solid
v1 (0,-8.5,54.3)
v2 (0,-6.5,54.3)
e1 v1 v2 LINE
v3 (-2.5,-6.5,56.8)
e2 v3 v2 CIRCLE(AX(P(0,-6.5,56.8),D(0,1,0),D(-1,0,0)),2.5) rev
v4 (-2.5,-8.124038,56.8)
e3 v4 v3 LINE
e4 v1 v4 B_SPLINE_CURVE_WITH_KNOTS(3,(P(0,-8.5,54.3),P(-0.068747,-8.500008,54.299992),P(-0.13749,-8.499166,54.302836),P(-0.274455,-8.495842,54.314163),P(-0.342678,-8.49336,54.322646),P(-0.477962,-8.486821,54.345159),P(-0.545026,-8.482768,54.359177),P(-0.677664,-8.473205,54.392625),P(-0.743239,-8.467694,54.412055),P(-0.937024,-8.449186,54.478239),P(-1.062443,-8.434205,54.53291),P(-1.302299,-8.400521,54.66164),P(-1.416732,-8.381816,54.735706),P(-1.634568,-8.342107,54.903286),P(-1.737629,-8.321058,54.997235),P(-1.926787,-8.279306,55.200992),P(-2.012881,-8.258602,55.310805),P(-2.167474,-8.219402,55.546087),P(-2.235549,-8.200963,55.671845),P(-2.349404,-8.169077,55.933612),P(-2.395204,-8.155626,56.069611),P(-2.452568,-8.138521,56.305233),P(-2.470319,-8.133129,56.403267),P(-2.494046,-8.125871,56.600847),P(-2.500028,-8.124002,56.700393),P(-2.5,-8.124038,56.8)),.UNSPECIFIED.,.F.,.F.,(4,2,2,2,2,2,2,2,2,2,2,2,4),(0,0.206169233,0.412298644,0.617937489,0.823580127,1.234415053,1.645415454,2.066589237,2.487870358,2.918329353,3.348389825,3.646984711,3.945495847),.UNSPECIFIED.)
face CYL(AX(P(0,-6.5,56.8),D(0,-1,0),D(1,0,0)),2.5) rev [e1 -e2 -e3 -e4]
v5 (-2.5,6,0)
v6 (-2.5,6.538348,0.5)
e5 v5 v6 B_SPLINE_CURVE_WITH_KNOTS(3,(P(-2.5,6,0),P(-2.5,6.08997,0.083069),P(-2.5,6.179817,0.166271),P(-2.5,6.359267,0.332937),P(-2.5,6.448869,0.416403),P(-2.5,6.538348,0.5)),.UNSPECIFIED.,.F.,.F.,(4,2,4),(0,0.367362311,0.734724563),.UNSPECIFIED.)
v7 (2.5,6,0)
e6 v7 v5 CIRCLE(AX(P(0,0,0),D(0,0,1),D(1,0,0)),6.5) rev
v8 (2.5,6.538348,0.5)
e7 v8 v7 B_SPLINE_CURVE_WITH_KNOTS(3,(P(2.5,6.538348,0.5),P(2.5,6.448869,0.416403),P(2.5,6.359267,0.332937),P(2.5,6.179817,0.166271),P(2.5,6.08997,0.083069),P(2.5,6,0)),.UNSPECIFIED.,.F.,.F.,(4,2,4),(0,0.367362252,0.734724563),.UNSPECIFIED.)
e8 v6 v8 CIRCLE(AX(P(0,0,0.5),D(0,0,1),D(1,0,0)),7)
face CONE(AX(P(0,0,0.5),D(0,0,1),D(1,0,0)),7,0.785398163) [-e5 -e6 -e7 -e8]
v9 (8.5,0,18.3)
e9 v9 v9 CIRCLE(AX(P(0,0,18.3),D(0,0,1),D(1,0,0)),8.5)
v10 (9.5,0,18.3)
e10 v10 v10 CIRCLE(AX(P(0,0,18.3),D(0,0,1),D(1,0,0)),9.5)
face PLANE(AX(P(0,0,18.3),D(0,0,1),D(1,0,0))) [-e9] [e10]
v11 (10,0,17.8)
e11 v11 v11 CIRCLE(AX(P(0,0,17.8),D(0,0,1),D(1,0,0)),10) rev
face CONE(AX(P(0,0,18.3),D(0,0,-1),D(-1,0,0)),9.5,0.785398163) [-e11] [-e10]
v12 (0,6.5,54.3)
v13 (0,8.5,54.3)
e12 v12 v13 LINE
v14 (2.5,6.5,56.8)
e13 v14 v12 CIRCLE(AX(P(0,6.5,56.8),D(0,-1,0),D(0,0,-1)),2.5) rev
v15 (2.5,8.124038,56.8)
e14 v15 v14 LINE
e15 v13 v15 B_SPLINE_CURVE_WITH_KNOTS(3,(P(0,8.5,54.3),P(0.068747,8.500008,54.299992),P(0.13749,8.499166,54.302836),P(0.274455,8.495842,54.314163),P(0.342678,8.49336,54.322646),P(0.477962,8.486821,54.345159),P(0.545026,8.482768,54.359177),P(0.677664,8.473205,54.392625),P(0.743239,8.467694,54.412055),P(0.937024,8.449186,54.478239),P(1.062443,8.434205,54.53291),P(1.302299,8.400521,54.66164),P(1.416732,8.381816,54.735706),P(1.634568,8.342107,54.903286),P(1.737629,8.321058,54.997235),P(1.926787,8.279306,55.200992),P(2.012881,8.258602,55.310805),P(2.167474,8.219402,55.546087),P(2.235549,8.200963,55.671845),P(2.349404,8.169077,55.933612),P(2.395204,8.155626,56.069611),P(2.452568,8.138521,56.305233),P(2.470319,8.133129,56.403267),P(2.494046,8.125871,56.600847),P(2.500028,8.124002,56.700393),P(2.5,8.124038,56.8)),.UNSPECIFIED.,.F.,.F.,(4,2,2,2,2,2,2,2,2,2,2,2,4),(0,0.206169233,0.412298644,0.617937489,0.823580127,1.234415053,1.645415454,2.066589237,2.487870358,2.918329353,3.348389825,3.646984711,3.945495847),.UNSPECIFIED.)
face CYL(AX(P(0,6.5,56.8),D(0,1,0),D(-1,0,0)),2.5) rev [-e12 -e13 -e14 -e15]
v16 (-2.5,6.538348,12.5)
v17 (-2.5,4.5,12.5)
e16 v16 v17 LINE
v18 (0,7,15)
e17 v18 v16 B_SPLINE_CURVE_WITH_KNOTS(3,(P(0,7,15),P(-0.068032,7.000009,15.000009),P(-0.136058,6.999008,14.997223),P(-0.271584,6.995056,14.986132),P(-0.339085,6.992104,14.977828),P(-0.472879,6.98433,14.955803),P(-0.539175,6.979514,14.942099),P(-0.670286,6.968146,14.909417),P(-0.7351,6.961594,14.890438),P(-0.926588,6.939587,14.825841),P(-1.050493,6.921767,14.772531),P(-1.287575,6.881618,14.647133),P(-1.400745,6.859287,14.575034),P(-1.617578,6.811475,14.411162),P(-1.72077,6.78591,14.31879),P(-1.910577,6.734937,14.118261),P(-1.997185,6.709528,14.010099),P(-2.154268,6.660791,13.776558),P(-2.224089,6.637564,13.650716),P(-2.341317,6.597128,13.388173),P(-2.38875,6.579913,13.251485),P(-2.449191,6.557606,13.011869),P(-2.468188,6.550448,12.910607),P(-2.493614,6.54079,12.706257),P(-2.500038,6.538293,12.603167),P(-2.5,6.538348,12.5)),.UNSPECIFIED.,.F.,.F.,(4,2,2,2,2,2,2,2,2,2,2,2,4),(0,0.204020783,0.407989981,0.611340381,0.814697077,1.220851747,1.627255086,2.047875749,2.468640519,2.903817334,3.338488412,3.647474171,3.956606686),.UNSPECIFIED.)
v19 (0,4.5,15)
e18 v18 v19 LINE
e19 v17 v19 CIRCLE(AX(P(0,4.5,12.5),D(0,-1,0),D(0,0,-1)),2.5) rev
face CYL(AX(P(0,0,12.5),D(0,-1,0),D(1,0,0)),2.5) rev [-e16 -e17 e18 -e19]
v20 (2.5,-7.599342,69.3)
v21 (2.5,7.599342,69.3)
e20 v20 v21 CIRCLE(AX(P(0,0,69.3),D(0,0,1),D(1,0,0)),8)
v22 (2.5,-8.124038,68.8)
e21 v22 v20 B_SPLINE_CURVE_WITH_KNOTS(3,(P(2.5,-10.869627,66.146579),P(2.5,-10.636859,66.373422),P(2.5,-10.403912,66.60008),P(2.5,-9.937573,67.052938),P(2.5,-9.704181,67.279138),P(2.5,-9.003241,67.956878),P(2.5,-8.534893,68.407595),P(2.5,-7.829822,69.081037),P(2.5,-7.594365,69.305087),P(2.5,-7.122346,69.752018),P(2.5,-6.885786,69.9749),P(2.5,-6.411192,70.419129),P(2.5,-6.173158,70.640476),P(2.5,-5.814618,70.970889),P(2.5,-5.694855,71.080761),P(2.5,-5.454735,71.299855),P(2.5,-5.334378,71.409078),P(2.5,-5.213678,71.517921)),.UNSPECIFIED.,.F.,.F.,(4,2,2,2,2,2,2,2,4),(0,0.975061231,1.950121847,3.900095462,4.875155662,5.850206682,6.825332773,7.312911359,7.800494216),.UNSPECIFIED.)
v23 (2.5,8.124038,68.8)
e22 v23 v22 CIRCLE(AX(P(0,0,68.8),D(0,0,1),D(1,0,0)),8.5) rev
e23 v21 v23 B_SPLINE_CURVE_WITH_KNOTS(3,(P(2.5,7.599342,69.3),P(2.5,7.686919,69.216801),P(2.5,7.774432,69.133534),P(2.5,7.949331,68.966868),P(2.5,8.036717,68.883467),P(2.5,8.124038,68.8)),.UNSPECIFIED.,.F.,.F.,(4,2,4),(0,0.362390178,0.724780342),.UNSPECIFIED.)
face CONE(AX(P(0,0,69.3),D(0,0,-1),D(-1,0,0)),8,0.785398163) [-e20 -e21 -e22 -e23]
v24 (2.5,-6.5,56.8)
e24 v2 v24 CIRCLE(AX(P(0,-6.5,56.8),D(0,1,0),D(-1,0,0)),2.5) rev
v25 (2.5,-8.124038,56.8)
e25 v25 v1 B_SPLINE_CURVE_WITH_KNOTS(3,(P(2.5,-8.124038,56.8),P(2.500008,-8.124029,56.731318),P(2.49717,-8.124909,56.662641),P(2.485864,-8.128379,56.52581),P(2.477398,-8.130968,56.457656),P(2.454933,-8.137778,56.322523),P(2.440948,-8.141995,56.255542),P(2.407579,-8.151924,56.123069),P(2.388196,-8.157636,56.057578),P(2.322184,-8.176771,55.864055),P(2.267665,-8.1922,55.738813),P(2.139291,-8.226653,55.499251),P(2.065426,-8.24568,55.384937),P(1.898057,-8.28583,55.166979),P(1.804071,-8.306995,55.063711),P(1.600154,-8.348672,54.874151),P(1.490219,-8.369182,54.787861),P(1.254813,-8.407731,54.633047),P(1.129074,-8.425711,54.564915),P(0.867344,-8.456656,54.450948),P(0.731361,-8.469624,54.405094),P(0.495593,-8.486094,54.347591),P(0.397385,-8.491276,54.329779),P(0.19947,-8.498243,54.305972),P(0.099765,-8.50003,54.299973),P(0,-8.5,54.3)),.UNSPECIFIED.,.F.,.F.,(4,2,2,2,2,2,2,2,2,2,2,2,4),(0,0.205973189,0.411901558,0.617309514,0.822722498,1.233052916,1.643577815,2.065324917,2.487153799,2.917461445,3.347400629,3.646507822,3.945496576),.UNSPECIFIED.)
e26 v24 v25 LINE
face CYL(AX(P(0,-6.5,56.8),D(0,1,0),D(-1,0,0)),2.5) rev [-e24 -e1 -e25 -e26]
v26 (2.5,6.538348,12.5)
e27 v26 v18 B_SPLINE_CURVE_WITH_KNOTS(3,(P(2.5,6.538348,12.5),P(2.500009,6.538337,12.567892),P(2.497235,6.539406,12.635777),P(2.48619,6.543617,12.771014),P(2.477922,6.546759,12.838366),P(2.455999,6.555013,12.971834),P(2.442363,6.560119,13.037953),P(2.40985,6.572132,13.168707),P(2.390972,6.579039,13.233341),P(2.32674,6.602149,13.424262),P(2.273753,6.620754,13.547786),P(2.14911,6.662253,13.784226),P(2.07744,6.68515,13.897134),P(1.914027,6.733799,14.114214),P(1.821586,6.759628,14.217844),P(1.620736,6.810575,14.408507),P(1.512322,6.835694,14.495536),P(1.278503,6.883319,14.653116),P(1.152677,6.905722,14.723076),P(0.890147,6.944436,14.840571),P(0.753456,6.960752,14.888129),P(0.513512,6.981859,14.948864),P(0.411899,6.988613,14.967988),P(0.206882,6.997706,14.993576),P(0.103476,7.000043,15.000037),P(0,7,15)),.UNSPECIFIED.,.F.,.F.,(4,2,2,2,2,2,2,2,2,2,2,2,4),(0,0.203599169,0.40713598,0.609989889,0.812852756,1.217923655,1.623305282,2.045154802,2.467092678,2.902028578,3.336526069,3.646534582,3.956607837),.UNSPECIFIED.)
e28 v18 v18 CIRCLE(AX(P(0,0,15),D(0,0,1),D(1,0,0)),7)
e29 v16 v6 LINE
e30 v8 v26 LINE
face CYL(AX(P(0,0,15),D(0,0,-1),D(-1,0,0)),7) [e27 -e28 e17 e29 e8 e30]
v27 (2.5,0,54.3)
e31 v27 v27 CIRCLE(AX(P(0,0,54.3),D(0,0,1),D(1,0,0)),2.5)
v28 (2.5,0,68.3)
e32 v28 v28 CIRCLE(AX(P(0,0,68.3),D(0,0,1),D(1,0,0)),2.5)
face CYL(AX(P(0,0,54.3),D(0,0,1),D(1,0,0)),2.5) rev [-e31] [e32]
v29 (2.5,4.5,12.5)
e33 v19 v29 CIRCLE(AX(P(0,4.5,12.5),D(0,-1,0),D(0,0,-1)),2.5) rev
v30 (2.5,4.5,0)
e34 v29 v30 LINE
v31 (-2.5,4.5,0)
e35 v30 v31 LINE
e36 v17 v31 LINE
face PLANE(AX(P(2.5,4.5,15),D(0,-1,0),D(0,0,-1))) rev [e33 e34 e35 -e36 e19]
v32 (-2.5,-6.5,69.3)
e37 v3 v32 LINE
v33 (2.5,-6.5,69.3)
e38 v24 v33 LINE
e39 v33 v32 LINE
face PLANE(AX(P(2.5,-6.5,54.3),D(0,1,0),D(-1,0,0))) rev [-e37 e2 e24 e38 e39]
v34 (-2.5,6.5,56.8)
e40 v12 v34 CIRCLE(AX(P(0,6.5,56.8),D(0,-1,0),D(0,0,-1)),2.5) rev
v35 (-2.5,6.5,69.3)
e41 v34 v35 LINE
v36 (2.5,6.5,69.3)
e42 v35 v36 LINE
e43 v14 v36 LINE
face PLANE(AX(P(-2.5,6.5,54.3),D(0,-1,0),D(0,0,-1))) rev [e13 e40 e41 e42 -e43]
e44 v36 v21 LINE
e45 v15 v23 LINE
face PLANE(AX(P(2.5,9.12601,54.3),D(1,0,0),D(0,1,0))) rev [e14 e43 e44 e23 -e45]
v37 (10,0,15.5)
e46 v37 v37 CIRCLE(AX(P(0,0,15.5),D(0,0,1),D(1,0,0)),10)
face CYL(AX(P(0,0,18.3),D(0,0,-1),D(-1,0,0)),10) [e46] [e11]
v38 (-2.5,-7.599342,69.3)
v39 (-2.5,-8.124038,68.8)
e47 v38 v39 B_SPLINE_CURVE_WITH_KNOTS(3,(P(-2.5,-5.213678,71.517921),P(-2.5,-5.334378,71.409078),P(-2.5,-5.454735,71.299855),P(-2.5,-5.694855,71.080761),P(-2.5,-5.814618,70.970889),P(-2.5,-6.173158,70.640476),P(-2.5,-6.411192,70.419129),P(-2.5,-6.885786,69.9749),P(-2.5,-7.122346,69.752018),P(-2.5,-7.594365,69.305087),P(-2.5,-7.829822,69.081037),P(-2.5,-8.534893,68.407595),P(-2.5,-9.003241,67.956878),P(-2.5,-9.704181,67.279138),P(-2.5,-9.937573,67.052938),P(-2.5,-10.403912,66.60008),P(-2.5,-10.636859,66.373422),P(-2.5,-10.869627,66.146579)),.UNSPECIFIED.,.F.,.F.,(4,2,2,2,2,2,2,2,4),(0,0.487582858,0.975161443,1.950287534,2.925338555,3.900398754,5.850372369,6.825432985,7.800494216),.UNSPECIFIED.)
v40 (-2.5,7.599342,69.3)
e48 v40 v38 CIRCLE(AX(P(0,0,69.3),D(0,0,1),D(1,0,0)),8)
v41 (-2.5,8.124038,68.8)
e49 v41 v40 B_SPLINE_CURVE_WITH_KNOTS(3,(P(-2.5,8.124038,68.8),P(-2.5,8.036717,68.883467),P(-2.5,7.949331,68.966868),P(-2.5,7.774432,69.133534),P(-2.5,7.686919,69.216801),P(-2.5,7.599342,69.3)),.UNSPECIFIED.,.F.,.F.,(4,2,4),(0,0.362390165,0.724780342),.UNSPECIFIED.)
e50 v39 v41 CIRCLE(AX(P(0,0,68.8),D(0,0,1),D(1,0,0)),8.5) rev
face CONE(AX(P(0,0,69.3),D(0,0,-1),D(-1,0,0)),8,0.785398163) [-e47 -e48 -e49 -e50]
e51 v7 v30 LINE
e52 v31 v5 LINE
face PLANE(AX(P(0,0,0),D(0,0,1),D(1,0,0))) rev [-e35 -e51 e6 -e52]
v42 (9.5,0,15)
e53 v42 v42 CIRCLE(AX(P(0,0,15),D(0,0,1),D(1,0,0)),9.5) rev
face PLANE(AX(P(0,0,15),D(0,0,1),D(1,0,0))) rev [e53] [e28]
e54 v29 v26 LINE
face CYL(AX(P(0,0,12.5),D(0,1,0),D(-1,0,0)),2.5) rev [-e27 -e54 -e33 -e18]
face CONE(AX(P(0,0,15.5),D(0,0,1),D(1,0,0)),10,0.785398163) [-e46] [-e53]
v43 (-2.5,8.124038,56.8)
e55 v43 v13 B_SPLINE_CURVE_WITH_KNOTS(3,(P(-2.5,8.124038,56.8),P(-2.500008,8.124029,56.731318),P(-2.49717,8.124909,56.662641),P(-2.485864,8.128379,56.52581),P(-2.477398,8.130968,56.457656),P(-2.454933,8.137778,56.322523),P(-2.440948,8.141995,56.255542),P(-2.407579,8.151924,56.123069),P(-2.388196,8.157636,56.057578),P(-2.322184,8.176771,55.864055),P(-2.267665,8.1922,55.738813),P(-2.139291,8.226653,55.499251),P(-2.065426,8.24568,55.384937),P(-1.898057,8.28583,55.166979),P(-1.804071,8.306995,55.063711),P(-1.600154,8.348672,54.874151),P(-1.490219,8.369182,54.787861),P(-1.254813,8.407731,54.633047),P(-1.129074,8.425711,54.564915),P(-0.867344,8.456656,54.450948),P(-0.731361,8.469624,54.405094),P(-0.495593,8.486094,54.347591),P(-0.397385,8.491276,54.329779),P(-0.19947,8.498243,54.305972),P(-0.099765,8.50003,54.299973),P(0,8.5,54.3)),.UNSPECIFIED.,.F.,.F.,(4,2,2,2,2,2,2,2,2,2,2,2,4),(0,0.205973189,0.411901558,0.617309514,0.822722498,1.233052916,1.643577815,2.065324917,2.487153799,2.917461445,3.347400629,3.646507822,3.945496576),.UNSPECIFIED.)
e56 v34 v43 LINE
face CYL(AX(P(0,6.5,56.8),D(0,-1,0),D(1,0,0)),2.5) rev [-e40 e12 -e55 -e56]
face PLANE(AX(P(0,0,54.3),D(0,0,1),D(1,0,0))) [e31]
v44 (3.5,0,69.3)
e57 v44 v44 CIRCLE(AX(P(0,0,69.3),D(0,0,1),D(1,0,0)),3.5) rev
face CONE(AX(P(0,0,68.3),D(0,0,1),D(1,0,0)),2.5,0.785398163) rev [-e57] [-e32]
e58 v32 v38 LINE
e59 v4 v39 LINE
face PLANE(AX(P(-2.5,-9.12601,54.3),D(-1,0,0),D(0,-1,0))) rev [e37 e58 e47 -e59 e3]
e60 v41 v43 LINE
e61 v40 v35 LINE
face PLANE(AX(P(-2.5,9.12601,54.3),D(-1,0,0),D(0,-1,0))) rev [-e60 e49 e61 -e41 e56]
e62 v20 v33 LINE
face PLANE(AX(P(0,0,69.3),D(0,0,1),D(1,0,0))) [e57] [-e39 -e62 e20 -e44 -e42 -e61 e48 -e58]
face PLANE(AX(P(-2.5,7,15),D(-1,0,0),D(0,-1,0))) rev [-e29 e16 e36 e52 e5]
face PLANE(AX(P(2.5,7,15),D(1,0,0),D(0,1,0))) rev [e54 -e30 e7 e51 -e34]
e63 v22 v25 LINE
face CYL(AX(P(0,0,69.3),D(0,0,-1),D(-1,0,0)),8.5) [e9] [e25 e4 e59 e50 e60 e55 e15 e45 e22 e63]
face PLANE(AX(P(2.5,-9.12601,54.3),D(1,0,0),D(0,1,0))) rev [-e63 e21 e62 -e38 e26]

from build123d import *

# Parameters (mm, degrees)
SKETCH_1_R               = 7
EXTRUDE_1_DEPTH          = 15
SKETCH_3_R               = 10
EXTRUDE_2_DEPTH          = 3.3
SKETCH_4_R               = 8.5
EXTRUDE_3_DEPTH          = 51
SKETCH_6_W               = 5
SKETCH_6_H               = 2.626010101
CUT_EXTRUDE_1_DEPTH      = 15
FILLET_1_R               = 2.5
SKETCH_7_R               = 2.5
CUT_EXTRUDE_2_DEPTH      = 15
SKETCH_8_W               = 5
SKETCH_8_H               = 2.5
CUT_EXTRUDE_3_DEPTH      = 15
FILLET_2_R               = 2.5
CHAMFER_1_SIZE           = 1
CHAMFER_2_SIZE           = 0.5
CHAMFER_3_SIZE           = 0.5
PATTERN_CIRCULAR_1_COUNT = 2
FILLET_3_R               = 2.5


with BuildPart() as part:
    # 草图1 → 拉伸1 (new body)
    with BuildSketch(Plane.XY):
        Circle(SKETCH_1_R)
    extrude(amount=EXTRUDE_1_DEPTH)

    # 草图3 → 拉伸2 (add)
    with BuildSketch(Plane.XY.offset(15)):
        Circle(SKETCH_3_R)
    extrude(amount=EXTRUDE_2_DEPTH)

    # 草图4 → 拉伸3 (add)
    with BuildSketch(Plane.XY.offset(18.3)):
        Circle(SKETCH_4_R)
    extrude(amount=EXTRUDE_3_DEPTH)

    # 草图6 → 切除-拉伸1 (cut)
    with BuildSketch(Plane.XY.offset(69.3)):
        with Locations((0, 7.813005051)):
            Rectangle(SKETCH_6_W, SKETCH_6_H)
    cut_extrude_1 = extrude(amount=-CUT_EXTRUDE_1_DEPTH, mode=Mode.SUBTRACT)

    # 圆角1
    fillet_1_edges = [part.edges().sort_by_distance(p)[0] for p in [
        (-2.5, 7.312019202, 54.3),
        (2.5, 7.312019202, 54.3),
    ]]
    fillet(fillet_1_edges, radius=FILLET_1_R - 0.0001)  # a hair under: the kernel refuses the full size

    # 草图7 → 切除-拉伸2 (cut)
    with BuildSketch(Plane.XY.offset(69.3)):
        Circle(SKETCH_7_R)
    extrude(amount=-CUT_EXTRUDE_2_DEPTH, mode=Mode.SUBTRACT)

    # 草图8 → 切除-拉伸3 (cut)
    with BuildSketch(Plane(origin=(0, 0, 0), x_dir=(-1, 0, 0), z_dir=(0, 0, -1))):
        with Locations((0, 5.75)):
            Rectangle(SKETCH_8_W, SKETCH_8_H)
    extrude(amount=-CUT_EXTRUDE_3_DEPTH, mode=Mode.SUBTRACT)

    # 圆角2
    fillet_2_edges = [part.edges().sort_by_distance(p)[0] for p in [
        (-2.5, 5.519174208, 15),
        (2.5, 5.519174208, 15),
    ]]
    fillet(fillet_2_edges, radius=FILLET_2_R - 0.0001)  # a hair under: the kernel refuses the full size

    # 倒角1
    chamfer_1_edges = [part.edges().sort_by_distance(p)[0] for p in [
        (-2.5, 0, 69.3),
    ]]
    chamfer(chamfer_1_edges, length=CHAMFER_1_SIZE)

    # 倒角2
    chamfer_2_edges = [part.edges().sort_by_distance(p)[0] for p in [
        (-5.049752469, -6.837397166, 69.3),
        (-10, 0, 15),
        (-10, 0, 18.3),
    ]]
    chamfer(chamfer_2_edges, length=CHAMFER_2_SIZE)

    # 倒角3
    chamfer_3_edges = [part.edges().sort_by_distance(p)[0] for p in [
        (0, -7, 0),
    ]]
    chamfer(chamfer_3_edges, length=CHAMFER_3_SIZE)

    # 阵列(圆周)1: 切除-拉伸1 ×2 about axis
    pattern_circular_1_axis = Axis((0, 0, 0), (0, 0, 1))
    for i in range(1, PATTERN_CIRCULAR_1_COUNT):
        add(cut_extrude_1.rotate(pattern_circular_1_axis, i * 360 / PATTERN_CIRCULAR_1_COUNT), mode=Mode.SUBTRACT)

    # 圆角3
    fillet_3_edges = [part.edges().sort_by_distance(p)[0] for p in [
        (-2.5, -7.312019202, 54.3),
        (2.5, -7.312019202, 54.3),
    ]]
    fillet(fillet_3_edges, radius=FILLET_3_R - 0.0001)  # a hair under: the kernel refuses the full size


solid = part.part
